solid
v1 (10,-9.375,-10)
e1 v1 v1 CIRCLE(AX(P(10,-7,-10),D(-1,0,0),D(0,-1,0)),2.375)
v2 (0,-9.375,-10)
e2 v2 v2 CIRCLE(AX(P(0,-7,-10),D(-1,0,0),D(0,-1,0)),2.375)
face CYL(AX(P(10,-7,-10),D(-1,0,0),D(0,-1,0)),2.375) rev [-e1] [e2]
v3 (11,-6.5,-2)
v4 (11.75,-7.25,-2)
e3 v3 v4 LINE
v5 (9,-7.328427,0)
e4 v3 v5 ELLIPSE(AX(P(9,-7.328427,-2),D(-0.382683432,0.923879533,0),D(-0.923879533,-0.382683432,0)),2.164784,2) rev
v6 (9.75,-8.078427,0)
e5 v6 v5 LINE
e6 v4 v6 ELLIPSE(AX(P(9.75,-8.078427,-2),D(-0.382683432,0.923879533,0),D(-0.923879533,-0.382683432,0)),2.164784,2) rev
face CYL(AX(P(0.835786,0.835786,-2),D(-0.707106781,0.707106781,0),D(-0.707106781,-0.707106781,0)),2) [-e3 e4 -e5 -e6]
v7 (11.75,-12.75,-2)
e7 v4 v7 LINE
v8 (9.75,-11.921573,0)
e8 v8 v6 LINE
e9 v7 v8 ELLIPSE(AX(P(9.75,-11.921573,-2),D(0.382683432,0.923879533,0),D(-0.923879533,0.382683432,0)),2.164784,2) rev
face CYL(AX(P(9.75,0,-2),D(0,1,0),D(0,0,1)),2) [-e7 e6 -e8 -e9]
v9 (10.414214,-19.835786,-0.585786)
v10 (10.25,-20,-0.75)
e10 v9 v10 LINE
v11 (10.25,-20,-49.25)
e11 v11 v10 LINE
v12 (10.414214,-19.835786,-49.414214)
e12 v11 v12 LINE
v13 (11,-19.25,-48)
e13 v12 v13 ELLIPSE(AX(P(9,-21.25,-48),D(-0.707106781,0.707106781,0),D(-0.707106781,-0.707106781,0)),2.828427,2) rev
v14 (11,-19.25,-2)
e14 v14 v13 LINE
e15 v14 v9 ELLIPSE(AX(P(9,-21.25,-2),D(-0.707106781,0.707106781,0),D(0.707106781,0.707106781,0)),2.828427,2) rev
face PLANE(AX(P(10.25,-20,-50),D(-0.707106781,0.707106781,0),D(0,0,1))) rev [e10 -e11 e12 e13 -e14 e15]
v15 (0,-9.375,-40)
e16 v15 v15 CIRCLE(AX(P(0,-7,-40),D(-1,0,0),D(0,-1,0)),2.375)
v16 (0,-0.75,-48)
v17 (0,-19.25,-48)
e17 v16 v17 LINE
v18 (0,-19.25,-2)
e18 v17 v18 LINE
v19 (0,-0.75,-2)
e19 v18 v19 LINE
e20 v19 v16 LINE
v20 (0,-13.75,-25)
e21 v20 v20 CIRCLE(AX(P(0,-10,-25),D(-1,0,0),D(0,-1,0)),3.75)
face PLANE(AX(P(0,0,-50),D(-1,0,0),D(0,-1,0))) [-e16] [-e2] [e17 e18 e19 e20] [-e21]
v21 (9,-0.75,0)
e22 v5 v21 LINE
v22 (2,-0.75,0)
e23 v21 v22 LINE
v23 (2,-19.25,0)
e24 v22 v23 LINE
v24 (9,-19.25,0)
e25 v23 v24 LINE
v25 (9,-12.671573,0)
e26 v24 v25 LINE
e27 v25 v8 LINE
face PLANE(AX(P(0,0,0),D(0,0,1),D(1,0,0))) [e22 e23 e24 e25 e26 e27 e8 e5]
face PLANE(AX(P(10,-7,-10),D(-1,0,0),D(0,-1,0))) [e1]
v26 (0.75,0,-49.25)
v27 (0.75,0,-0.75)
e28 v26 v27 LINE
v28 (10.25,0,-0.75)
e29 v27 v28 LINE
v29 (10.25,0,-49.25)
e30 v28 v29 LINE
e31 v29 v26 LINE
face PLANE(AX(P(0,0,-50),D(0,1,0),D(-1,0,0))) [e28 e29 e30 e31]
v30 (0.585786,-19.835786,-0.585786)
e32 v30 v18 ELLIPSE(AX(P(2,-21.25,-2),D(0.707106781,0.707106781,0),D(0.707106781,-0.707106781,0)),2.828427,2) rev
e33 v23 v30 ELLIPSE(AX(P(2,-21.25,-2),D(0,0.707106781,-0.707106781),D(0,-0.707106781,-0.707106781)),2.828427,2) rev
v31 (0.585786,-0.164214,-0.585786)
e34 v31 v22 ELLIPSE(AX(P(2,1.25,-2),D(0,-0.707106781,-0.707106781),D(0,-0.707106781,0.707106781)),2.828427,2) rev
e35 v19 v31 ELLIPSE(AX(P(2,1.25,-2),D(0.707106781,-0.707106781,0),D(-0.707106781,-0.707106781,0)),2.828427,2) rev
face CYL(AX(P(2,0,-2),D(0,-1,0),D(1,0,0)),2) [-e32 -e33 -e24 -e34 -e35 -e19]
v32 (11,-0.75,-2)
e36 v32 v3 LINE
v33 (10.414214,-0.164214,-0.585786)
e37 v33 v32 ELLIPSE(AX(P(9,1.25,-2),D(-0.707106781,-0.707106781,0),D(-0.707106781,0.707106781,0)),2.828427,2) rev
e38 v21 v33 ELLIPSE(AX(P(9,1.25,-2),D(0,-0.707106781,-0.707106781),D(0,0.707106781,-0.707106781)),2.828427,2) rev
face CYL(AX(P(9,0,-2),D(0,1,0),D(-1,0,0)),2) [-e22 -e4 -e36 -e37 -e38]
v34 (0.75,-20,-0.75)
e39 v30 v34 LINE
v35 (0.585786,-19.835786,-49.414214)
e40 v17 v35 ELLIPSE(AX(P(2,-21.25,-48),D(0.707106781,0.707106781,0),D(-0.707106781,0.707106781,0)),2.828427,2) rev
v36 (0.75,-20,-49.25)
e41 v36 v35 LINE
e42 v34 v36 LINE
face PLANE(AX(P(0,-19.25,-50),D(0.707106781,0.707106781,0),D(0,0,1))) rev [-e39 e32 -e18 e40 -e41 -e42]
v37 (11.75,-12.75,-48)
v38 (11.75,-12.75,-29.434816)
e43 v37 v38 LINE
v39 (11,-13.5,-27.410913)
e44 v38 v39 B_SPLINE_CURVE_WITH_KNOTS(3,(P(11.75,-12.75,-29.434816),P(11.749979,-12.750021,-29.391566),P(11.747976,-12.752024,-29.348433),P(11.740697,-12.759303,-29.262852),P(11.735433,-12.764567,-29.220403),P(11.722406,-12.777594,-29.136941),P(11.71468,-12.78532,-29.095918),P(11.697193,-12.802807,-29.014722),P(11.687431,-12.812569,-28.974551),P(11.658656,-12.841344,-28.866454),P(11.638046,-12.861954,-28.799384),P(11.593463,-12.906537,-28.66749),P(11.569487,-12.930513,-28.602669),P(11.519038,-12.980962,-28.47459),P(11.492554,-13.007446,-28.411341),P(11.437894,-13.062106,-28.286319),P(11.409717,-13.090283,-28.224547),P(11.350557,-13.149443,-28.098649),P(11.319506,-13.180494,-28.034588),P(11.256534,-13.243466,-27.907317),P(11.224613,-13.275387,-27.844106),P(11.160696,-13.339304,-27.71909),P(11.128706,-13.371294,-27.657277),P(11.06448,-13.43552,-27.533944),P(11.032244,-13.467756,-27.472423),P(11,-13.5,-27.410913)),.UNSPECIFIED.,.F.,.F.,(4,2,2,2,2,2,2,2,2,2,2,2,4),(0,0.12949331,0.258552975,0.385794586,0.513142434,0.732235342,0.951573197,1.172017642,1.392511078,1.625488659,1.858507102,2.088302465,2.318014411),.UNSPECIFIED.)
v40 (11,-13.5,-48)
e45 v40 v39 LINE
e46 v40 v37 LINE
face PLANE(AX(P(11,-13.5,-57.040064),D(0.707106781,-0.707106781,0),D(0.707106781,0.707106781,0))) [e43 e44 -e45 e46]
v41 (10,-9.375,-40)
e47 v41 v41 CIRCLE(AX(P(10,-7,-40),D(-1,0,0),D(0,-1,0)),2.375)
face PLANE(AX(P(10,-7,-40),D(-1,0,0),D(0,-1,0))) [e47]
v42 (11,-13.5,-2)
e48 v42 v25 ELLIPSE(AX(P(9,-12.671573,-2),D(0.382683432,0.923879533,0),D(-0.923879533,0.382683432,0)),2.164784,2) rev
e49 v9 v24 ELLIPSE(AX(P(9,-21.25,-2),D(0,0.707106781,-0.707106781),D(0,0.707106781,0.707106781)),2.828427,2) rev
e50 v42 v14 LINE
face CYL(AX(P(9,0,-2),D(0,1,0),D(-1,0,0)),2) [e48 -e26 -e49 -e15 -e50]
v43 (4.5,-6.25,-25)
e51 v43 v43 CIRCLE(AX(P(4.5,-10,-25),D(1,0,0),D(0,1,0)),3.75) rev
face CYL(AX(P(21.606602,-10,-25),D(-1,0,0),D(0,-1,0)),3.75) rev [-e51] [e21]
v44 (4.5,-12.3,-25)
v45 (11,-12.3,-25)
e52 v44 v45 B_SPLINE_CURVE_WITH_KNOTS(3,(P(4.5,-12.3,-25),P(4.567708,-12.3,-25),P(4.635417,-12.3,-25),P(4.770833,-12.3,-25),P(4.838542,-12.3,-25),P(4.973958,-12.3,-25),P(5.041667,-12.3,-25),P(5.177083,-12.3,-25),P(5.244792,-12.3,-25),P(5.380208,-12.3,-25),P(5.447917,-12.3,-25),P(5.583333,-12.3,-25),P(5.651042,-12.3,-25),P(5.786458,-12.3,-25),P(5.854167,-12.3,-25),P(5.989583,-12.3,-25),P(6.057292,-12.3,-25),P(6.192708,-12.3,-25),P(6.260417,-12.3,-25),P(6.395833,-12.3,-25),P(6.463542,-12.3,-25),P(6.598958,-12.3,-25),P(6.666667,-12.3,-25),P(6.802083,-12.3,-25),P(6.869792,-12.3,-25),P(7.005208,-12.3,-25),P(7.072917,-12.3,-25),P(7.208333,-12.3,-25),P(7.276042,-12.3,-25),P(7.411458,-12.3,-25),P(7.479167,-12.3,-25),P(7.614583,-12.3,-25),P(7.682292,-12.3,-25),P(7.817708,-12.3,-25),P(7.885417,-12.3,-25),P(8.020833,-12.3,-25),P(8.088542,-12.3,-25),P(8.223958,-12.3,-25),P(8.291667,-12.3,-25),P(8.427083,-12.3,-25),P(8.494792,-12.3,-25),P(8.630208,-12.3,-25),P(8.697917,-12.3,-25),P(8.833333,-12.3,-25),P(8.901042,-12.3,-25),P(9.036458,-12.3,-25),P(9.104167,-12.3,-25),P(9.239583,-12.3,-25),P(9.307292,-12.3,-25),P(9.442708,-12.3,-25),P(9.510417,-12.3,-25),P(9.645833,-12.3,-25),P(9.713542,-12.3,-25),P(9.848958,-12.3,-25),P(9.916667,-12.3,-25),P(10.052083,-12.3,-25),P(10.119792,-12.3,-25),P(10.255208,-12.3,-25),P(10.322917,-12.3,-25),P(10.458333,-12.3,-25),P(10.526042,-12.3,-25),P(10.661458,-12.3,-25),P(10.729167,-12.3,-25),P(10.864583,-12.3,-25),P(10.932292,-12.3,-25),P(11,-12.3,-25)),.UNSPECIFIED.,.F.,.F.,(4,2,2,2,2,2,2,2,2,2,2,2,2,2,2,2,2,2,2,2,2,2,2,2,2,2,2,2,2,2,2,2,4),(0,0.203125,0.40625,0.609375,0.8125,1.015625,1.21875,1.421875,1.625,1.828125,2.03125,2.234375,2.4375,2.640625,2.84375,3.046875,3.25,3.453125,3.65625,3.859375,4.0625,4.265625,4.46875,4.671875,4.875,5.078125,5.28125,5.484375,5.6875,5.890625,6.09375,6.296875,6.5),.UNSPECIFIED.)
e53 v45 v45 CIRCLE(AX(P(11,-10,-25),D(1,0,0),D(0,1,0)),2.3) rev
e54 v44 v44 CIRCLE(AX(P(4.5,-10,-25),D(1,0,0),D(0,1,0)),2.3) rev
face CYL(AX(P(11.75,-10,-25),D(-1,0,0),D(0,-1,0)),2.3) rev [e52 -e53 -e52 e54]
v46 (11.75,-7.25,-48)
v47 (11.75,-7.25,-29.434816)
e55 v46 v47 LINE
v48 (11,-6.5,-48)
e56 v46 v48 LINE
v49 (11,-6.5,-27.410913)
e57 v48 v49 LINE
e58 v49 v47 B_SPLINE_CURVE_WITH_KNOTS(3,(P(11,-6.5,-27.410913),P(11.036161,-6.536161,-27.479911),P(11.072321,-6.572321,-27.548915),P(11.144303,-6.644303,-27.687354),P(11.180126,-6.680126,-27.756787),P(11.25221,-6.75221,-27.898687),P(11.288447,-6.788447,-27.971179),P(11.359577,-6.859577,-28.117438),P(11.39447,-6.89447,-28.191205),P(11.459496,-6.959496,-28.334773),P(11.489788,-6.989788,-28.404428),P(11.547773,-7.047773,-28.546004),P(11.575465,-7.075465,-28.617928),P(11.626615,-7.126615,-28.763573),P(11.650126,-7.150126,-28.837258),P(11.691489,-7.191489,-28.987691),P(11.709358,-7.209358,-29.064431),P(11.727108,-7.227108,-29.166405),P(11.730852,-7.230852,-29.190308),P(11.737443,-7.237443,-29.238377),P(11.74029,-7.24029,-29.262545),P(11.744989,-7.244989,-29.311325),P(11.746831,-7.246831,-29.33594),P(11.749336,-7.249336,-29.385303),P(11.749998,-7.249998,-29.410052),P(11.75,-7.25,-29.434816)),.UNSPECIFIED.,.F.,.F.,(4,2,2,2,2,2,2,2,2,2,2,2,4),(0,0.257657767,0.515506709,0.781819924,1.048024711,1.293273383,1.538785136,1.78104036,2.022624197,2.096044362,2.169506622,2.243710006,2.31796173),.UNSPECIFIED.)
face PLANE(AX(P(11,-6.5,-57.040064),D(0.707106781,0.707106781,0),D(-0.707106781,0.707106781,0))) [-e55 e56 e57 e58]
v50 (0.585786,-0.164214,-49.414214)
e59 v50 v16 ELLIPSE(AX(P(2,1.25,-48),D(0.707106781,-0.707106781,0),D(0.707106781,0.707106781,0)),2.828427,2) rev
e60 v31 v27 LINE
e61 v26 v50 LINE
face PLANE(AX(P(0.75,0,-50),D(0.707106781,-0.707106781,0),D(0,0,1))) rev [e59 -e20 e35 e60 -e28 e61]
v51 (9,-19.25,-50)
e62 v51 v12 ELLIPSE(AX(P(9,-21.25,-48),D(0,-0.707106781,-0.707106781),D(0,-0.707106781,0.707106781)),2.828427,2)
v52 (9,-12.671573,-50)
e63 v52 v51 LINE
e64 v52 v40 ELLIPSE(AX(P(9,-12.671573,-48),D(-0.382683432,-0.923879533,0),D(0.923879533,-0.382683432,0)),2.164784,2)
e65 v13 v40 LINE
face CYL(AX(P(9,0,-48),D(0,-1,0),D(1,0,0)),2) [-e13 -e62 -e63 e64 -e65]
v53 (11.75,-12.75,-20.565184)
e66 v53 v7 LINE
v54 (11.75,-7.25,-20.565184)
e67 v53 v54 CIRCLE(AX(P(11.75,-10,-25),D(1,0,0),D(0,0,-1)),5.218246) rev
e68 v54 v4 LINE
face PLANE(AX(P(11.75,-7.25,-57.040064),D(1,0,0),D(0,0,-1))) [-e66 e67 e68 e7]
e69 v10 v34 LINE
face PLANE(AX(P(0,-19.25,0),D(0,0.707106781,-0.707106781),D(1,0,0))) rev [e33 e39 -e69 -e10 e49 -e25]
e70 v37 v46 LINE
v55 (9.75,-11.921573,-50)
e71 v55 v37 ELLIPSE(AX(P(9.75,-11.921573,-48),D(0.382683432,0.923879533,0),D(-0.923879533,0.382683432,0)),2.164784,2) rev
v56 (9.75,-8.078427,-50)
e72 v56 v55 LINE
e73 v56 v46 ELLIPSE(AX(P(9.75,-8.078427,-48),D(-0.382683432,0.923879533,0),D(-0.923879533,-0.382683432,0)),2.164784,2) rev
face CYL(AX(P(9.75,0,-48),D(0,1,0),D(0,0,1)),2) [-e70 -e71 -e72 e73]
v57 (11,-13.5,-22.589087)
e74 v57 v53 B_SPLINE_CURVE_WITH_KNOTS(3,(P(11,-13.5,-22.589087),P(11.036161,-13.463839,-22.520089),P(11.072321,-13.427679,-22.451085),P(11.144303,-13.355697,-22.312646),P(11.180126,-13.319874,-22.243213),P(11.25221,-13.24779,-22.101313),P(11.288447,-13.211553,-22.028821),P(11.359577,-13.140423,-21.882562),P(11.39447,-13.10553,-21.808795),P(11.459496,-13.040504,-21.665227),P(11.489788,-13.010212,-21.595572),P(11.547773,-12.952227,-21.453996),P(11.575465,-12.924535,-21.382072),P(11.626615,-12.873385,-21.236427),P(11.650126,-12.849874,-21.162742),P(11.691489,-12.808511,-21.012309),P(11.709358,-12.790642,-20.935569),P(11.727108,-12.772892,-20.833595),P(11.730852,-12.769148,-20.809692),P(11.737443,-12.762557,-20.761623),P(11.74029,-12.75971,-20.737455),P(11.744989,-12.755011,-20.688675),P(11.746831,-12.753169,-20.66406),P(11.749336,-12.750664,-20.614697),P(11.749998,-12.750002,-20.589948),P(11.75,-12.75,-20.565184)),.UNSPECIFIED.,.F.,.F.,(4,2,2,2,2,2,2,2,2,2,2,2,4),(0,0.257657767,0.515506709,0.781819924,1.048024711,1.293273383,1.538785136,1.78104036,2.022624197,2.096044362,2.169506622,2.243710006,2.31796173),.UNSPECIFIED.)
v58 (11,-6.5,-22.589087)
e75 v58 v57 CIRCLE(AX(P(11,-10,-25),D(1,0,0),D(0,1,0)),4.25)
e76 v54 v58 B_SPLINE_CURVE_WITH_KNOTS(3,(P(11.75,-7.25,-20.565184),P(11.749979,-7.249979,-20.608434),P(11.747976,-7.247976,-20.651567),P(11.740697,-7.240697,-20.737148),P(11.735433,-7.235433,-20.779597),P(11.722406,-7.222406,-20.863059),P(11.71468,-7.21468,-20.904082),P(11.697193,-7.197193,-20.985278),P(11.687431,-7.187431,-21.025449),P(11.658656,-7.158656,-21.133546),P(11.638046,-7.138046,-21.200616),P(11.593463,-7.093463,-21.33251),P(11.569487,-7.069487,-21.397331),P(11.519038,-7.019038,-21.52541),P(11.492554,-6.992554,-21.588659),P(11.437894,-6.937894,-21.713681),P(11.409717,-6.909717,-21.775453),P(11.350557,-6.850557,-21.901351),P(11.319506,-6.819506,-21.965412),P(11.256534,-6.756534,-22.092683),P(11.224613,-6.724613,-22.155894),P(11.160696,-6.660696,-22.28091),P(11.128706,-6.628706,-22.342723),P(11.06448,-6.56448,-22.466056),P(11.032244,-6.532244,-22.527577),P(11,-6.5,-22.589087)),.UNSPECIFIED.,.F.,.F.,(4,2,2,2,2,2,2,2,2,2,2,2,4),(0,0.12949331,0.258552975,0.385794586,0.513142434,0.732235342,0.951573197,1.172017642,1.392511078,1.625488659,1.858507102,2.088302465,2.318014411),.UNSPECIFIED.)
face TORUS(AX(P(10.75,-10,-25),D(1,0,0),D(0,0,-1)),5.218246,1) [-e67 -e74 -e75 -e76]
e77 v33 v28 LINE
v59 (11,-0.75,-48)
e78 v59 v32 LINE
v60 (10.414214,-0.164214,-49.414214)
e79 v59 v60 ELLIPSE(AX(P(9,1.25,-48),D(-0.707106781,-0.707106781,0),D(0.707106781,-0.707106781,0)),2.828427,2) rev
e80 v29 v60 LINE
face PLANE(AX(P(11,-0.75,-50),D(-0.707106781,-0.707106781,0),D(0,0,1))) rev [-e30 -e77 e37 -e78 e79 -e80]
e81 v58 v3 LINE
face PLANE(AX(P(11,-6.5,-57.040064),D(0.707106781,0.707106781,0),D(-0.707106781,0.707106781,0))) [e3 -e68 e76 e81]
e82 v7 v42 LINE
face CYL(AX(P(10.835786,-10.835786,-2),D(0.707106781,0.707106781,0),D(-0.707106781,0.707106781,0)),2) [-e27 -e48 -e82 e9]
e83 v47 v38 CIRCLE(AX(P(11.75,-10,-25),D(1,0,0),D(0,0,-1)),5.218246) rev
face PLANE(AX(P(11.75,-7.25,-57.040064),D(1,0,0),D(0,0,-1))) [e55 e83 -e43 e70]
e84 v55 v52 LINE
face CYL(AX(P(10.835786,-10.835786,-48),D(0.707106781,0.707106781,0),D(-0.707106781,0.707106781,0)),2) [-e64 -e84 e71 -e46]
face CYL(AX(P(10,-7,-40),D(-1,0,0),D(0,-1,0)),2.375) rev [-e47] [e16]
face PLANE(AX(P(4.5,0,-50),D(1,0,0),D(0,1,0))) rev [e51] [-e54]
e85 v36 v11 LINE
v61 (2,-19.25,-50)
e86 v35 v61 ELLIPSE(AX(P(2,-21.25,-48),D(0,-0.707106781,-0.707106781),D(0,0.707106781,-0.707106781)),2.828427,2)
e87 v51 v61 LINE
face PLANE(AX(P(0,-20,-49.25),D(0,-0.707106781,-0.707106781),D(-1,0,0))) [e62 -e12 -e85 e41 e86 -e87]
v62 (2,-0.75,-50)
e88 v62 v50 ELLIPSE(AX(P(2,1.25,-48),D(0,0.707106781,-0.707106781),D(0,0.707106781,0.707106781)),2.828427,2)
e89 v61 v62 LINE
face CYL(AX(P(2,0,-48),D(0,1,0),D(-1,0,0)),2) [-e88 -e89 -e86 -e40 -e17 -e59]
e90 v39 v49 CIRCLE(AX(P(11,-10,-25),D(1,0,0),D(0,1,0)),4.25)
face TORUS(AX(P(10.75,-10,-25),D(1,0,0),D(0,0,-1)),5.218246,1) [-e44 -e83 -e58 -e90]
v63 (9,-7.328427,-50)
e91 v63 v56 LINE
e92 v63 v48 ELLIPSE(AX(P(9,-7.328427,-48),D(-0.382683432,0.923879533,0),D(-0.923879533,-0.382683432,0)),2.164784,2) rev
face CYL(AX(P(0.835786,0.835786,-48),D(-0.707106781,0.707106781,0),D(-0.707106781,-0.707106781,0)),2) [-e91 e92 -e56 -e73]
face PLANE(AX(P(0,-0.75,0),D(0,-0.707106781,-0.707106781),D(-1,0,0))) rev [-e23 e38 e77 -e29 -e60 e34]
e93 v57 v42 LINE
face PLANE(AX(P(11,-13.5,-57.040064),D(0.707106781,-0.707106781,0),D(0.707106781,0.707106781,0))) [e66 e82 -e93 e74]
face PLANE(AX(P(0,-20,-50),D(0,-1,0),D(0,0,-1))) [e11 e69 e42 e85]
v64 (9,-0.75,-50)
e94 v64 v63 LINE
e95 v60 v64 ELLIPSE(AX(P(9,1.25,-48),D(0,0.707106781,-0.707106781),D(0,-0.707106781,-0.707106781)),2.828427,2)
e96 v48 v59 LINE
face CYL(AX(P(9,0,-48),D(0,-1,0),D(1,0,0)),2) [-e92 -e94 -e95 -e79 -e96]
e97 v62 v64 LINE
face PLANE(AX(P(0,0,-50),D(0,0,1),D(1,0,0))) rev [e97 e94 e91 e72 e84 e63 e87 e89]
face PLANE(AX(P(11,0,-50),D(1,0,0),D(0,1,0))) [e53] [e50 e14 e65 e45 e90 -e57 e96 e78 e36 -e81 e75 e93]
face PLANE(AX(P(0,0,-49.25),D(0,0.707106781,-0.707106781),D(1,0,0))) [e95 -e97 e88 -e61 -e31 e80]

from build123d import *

# Parameters (mm, degrees)
SKIZZE3_W                       = 11
SKIZZE3_H                       = 20
AUFSATZ_LINEAR_AUSTRAGEN1_DEPTH = 50
SKIZZE4_R                       = 2.375
SCHNITT_LINEAR_AUSTRAGEN1_DEPTH = 10
AUFSATZ_LINEAR_AUSTRAGEN2_DEPTH = 50
SKIZZE5_R                       = 2.3
SCHNITT_LINEAR_AUSTRAGEN2_DEPTH = 56.11862208
SKIZZE6_R                       = 3.75
SCHNITT_LINEAR_AUSTRAGEN3_DEPTH = 4.5
SKIZZE8_R                       = 4.25
SCHNITT_LINEAR_AUSTRAGEN4_DEPTH = 6.5
VERRUNDUNG1_R                   = 1
FASE1_SIZE                      = 0.75
VERRUNDUNG2_R                   = 2


with BuildPart() as part:
    # Skizze3 → Aufsatz-Linear austragen1 (new body)
    with BuildSketch(Plane.XY):
        with Locations((5.5, -10)):
            Rectangle(SKIZZE3_W, SKIZZE3_H)
    extrude(amount=-AUFSATZ_LINEAR_AUSTRAGEN1_DEPTH)

    # Skizze4 → Schnitt-Linear austragen1 (cut)
    with BuildSketch(Plane.ZY):
        with Locations(Location((-40, -7, 0), (0, 0, 270))):
            Circle(SKIZZE4_R)
        with Locations(Location((-10, -7, 0), (0, 0, 270))):
            Circle(SKIZZE4_R)
    extrude(amount=-SCHNITT_LINEAR_AUSTRAGEN1_DEPTH, mode=Mode.SUBTRACT)

    # Skizze7 → Aufsatz-Linear austragen2 (add)
    with BuildSketch(Plane.XY):
        Polygon((11, -13.5), (11, -6.5), (11.75, -7.25), (11.75, -12.75), align=None)
    extrude(amount=-AUFSATZ_LINEAR_AUSTRAGEN2_DEPTH)

    # Skizze5 → Schnitt-Linear austragen2 (cut, through all)
    with BuildSketch(Plane.ZY):
        with Locations(Location((-25, -10, 0), (0, 0, 270))):
            Circle(SKIZZE5_R)
    extrude(amount=-SCHNITT_LINEAR_AUSTRAGEN2_DEPTH, mode=Mode.SUBTRACT)

    # Skizze6 → Schnitt-Linear austragen3 (cut)
    with BuildSketch(Plane.ZY):
        with Locations(Location((-25, -10, 0), (0, 0, 270))):
            Circle(SKIZZE6_R)
    extrude(amount=-SCHNITT_LINEAR_AUSTRAGEN3_DEPTH, mode=Mode.SUBTRACT)

    # Skizze8 → Schnitt-Linear austragen4 (cut)
    with BuildSketch(Plane(origin=(11, 0, 0), x_dir=(0, 0, -1), z_dir=(1, 0, 0))):
        with Locations((25, -10)):
            Circle(SKIZZE8_R)
    extrude(amount=SCHNITT_LINEAR_AUSTRAGEN4_DEPTH, mode=Mode.SUBTRACT)

    # Verrundung1
    # the kernel refuses this fillet: 1 mm, written as the material it takes off along each edge
    with BuildSketch(Plane(origin=(11.75, -10, -25), x_dir=(0, 0.9561204309063354, -0.29297392649088017), z_dir=(0, 0.29297392649088017, 0.9561204309063354))) as verrundung1_piece_1:
        with BuildLine():
            CenterArc((5.218245837, 1), VERRUNDUNG1_R, 194.477512186, 75.522487814)
            Line((5.218245837, 0), (5.218245837, -0.02))
            Line((5.218245837, -0.02), (4.25, -0.02))
            Line((4.25, -0.02), (4.23, 0))
            ThreePointArc((4.23, 0), (4.23, 0.375), (4.230635083, 0.745))
            Line((4.230635083, 0.745), (4.25, 0.75))
        make_face()
    revolve(axis=Axis((11.75, -10, -25), (-1, 0, 0)), revolution_arc=145.927830349, mode=Mode.SUBTRACT)
    with BuildSketch(Plane(origin=(11.75, -10, -25), x_dir=(0, -0.9561204309062743, 0.292973926491079), z_dir=(0, -0.292973926491079, -0.9561204309062743))) as verrundung1_piece_2:
        with BuildLine():
            CenterArc((5.218245837, 1), VERRUNDUNG1_R, 194.477512186, 75.522487814)
            Line((5.218245837, 0), (5.218245837, -0.02))
            Line((5.218245837, -0.02), (4.25, -0.02))
            Line((4.25, -0.02), (4.23, 0))
            ThreePointArc((4.23, 0), (4.23, 0.375), (4.230635083, 0.745))
            Line((4.230635083, 0.745), (4.25, 0.75))
        make_face()
    revolve(axis=Axis((11.75, -10, -25), (-1, 0, 0)), revolution_arc=145.927830349, mode=Mode.SUBTRACT)

    # Fase1
    fase1_edges = [part.edges().sort_by_distance(p)[0] for p in [
        (5.5, -20, -50),
        (5.5, -20, 0),
        (5.5, 0, 0),
        (11, -20, -25),
        (0, -20, -25),
        (0, 0, -25),
        (11, 0, -25),
        (5.5, 0, -50),
    ]]
    chamfer(fase1_edges, length=FASE1_SIZE)

    # Verrundung2
    verrundung2_edges = [part.edges().sort_by_distance(p)[0] for p in [
        (11, -3.625, 0),
        (11, -3.625, -50),
        (11.375, -6.875, 0),
        (11.375, -13.125, 0),
        (11.75, -10, 0),
        (11.375, -6.875, -50),
        (11.75, -10, -50),
        (11.375, -13.125, -50),
        (0, -10, 0),
        (0, -10, -50),
        (11, -16.375, -50),
        (11, -16.375, 0),
    ]]
    fillet(verrundung2_edges, radius=VERRUNDUNG2_R)


solid = part.part
